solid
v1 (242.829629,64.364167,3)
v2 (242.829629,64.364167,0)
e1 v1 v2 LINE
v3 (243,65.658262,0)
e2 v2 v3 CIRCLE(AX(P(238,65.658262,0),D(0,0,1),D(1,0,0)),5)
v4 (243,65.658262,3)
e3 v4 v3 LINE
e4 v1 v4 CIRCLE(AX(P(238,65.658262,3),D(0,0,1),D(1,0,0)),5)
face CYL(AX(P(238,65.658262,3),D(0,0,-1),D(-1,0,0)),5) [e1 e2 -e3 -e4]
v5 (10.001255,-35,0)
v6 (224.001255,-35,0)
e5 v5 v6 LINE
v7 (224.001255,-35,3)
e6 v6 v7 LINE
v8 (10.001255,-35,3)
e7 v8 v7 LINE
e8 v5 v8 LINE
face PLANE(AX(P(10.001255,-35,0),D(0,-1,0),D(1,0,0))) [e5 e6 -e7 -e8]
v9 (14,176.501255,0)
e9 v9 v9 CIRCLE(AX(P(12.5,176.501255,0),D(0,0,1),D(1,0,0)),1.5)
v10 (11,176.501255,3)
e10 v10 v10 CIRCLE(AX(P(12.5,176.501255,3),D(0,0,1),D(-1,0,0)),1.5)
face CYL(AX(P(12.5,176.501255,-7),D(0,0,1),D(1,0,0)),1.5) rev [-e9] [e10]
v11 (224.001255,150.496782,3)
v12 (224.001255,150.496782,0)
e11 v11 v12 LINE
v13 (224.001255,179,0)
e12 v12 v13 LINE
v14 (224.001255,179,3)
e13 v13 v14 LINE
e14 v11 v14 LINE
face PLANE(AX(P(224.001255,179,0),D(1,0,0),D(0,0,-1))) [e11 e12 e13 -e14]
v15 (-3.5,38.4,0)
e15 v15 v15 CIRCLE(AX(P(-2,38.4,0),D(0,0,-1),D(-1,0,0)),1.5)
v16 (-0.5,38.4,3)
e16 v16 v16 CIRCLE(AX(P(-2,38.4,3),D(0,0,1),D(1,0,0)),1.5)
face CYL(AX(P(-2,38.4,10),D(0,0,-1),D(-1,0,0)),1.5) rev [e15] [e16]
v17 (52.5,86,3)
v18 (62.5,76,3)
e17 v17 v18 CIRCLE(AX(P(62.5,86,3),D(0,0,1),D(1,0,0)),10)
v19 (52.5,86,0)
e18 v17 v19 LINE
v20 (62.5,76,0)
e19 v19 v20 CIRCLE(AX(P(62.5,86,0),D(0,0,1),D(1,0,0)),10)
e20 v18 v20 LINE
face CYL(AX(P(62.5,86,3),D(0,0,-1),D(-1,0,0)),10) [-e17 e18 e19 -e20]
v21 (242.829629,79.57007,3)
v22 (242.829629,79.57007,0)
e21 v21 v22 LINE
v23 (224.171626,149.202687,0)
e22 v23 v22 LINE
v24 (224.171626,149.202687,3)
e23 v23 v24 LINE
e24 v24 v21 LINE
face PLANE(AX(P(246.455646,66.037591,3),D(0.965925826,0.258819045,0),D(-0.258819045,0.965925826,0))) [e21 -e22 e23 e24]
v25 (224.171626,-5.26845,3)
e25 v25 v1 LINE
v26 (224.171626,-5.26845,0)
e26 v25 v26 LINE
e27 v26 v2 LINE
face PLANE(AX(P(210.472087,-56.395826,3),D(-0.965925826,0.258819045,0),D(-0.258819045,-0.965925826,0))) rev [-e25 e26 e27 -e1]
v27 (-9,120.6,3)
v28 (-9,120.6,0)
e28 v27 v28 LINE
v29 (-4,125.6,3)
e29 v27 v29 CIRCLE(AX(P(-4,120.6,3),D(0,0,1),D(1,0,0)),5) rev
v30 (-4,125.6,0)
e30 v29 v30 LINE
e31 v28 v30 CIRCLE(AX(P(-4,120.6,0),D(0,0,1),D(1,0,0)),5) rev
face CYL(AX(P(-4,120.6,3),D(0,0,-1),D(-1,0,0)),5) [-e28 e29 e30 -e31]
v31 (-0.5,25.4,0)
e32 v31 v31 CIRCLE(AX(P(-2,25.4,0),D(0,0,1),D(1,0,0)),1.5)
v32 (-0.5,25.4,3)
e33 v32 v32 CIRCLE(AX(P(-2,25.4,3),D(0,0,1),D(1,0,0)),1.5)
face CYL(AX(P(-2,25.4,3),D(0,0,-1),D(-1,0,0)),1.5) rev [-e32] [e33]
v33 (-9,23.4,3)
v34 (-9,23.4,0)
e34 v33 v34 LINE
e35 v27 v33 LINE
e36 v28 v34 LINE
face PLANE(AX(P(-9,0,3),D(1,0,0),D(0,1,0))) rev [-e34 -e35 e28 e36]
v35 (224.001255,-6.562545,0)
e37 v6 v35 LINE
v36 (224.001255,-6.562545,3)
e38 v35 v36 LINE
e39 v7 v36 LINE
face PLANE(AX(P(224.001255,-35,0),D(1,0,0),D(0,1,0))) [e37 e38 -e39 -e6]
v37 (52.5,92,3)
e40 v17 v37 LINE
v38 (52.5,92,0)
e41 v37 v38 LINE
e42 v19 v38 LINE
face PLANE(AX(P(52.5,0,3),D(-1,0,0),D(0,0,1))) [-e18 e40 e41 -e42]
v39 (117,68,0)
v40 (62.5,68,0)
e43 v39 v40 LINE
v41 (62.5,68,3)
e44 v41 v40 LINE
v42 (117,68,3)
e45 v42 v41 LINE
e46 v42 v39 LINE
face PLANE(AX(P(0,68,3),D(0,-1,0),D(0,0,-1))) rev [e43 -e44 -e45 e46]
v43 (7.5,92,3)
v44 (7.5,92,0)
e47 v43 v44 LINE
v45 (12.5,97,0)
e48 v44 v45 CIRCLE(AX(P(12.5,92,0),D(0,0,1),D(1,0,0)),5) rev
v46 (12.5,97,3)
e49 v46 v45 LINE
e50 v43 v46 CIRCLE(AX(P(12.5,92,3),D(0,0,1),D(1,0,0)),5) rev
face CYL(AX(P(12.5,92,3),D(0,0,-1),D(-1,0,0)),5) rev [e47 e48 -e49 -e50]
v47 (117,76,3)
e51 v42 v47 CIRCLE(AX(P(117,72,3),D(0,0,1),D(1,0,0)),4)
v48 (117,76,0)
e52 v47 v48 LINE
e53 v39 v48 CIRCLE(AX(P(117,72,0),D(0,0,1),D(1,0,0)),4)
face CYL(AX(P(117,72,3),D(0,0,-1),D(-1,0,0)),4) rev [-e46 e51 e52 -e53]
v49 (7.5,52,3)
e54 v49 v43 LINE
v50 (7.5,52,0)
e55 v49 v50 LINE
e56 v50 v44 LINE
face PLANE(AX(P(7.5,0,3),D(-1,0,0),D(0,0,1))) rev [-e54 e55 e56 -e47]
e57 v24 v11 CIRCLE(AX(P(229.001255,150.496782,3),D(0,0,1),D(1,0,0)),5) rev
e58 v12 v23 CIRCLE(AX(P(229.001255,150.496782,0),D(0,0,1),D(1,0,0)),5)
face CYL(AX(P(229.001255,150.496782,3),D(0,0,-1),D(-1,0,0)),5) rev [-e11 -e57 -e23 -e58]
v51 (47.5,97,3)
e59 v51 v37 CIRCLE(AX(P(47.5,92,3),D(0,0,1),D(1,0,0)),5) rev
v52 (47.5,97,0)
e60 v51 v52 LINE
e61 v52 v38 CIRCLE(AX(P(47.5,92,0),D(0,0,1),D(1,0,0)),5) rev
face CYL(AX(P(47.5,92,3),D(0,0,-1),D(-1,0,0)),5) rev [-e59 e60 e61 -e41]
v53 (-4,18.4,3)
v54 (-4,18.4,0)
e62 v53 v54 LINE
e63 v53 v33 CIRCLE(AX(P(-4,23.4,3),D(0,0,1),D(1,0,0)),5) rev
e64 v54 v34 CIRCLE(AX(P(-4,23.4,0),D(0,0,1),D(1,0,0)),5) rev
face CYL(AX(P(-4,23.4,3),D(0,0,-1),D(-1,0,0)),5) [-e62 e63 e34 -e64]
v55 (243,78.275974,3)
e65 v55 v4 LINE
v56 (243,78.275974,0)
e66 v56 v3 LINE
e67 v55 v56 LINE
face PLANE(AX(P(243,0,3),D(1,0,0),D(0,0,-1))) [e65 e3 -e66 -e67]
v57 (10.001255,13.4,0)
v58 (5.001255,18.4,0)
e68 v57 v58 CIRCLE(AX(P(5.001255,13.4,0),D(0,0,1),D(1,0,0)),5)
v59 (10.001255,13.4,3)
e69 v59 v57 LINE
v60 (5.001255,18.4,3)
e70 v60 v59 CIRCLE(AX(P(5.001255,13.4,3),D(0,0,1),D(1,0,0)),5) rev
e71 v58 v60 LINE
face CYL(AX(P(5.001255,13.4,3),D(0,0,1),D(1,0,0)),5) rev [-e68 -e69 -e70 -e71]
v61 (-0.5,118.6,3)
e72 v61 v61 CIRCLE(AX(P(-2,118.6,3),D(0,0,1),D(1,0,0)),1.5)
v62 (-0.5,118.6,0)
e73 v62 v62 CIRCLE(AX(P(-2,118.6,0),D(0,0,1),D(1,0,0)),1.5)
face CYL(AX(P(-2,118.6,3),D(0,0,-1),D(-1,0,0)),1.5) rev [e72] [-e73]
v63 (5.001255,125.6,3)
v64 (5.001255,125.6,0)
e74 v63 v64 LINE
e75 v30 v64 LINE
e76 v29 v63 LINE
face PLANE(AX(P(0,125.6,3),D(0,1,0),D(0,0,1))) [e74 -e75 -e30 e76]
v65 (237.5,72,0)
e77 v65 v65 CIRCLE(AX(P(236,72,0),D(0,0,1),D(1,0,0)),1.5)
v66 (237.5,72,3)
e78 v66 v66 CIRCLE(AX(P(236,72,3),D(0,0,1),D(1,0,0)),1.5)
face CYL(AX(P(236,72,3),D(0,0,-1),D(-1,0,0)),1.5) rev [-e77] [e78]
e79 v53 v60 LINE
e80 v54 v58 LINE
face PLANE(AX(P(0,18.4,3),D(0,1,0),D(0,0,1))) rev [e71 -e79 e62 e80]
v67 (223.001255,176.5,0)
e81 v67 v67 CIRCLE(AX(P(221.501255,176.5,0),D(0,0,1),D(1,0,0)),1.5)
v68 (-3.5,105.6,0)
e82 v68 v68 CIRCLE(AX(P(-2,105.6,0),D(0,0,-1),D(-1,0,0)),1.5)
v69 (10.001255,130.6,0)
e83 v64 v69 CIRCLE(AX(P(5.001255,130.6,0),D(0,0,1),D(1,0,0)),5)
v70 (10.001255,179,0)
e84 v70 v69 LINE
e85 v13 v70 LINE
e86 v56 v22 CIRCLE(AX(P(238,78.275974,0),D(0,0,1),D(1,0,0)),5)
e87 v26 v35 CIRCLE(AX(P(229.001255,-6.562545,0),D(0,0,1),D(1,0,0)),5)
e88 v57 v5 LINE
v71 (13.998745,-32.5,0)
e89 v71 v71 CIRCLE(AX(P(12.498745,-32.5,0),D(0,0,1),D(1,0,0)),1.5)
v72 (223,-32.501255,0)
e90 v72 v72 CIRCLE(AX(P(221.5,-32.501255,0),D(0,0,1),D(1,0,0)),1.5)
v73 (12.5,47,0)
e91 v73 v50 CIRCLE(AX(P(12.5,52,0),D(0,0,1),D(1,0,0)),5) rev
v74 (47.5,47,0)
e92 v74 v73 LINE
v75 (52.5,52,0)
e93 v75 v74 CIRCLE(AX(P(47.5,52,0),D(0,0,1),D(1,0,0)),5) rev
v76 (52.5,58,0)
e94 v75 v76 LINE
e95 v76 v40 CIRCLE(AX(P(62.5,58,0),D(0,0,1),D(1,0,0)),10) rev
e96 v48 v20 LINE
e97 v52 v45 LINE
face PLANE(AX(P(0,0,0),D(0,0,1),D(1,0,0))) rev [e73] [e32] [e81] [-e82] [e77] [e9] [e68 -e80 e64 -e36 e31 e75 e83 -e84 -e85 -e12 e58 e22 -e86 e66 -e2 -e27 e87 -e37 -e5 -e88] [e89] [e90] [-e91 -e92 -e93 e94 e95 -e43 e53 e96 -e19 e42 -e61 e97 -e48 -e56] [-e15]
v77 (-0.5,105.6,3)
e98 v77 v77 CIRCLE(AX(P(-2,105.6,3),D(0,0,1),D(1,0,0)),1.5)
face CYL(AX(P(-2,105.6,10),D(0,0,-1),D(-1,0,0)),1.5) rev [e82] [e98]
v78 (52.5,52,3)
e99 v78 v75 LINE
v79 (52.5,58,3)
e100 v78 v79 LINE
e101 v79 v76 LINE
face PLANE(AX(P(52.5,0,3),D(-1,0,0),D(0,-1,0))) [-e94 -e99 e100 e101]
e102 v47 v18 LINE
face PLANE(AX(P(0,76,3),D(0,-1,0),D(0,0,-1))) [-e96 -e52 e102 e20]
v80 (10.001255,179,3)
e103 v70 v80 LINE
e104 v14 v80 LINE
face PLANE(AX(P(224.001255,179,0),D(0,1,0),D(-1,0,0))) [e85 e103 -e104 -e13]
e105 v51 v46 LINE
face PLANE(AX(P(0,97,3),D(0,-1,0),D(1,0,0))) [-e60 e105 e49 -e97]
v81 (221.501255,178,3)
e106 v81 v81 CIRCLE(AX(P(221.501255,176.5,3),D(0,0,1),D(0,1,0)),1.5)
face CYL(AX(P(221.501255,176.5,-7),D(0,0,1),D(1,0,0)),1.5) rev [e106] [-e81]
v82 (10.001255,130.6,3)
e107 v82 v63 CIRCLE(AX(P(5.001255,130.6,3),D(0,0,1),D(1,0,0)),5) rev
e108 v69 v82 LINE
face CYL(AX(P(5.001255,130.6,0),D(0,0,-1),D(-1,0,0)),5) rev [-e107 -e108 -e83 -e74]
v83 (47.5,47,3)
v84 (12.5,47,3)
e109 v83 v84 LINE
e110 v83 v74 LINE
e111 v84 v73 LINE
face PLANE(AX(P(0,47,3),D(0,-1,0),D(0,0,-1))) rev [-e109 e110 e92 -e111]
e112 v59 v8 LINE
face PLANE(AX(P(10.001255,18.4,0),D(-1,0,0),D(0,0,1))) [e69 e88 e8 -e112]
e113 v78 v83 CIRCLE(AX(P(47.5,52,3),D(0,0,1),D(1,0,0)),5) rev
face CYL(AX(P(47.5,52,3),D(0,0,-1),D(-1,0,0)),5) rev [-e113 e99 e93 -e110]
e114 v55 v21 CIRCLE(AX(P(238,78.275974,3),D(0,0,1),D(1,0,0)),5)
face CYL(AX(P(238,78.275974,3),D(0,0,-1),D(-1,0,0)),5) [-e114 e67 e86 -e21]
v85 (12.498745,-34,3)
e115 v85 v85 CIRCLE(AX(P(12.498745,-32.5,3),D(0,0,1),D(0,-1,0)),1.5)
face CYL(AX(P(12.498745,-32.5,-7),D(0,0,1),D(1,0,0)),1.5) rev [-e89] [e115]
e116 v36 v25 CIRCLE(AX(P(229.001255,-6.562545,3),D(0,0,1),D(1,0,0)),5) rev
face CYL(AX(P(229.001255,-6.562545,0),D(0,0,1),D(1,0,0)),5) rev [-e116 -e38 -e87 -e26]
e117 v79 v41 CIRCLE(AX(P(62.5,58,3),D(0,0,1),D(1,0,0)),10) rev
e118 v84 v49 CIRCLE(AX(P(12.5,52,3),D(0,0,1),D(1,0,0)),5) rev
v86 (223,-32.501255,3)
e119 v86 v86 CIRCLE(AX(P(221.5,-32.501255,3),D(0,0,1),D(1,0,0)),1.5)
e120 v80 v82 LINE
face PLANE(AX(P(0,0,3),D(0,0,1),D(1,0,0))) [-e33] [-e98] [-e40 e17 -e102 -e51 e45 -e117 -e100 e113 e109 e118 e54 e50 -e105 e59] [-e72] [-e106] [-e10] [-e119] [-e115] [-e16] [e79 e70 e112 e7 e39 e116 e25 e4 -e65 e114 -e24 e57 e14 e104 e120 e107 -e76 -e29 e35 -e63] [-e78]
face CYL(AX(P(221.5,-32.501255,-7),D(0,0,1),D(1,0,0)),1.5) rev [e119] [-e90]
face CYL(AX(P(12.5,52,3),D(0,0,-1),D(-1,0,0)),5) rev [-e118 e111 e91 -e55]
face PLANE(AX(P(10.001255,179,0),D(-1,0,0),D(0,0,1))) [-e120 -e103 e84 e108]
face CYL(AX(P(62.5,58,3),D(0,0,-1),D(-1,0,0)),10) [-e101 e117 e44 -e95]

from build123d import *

# Parameters (mm, degrees)
BOSS_EXTRUDE1_OUTLINE_R = 1.5
BOSS_EXTRUDE1_DEPTH     = 3
SKETCH1_R               = 1.5
CUT_EXTRUDE1_DEPTH      = 10
CIRPATTERN1_COUNT       = 4
SKETCH3_W               = 736.909485963
SKETCH3_H               = 680.360125743
CUT_EXTRUDE2_DEPTH      = 304.313928241
FILLET2_R               = 5
FILLET3_R               = 5
SKETCH4_R               = 1.5
CUT_EXTRUDE3_DEPTH      = 10


# Read off the part's stored shape, not the designer's step: Boss-Extrude1
with BuildPart() as part:
    # Boss-Extrude1 outline → Boss-Extrude1 (new body)
    with BuildSketch(Plane.XY):
        with BuildLine():
            ThreePointArc((227.170370868, 138.011217036), (227.042775693, 138.652681301), (227, 139.305312262))
            Line((227, 139.305312262), (227, 176.497490519))
            ThreePointArc((227, 176.497490519), (225.535533906, 180.033024425), (222, 181.497490519))
            Line((222, 181.497490519), (12.343347406, 181.497486855))
            ThreePointArc((12.343347406, 181.497486855), (8.909508183, 179.979649569), (7.5, 176.499941461))
            Line((7.5, 176.499941461), (7.5, 130.6))
            ThreePointArc((7.5, 130.6), (6.035533906, 127.064466094), (2.5, 125.6))
            Line((2.5, 125.6), (-4, 125.6))
            ThreePointArc((-4, 125.6), (-7.535533906, 124.135533906), (-9, 120.6))
            Line((-9, 120.6), (-9, 23.4))
            ThreePointArc((-9, 23.4), (-7.535533906, 19.864466094), (-4, 18.4))
            Line((-4, 18.4), (2.5, 18.4))
            ThreePointArc((2.5, 18.4), (6.035533906, 16.935533906), (7.5, 13.4))
            Line((7.5, 13.4), (7.5, -32.5))
            ThreePointArc((7.5, -32.5), (8.964466094, -36.035533906), (12.5, -37.5))
            Line((12.5, -37.5), (221.5, -37.5))
            ThreePointArc((221.5, -37.5), (225.035533906, -36.035533906), (226.5, -32.5))
            Line((226.5, -32.5), (226.5, 2.762899187))
            ThreePointArc((226.5, 2.762899187), (226.542775693, 3.415530148), (226.670370869, 4.056994413))
            Line((226.670370869, 4.056994413), (242.829629131, 64.364167262))
            ThreePointArc((242.829629131, 64.364167262), (242.957224307, 65.005631527), (243, 65.658262488))
            Line((243, 65.658262488), (243, 78.275974364))
            ThreePointArc((243, 78.275974364), (242.957224307, 78.928605325), (242.829629131, 79.570069589))
            Line((242.829629131, 79.570069589), (227.170370868, 138.011217036))
        make_face()
        with Locations((-2, 25.4)):
            Circle(BOSS_EXTRUDE1_OUTLINE_R, mode=Mode.SUBTRACT)
        with Locations((-2, 118.6)):
            Circle(BOSS_EXTRUDE1_OUTLINE_R, mode=Mode.SUBTRACT)
        with BuildLine():
            ThreePointArc((62.5, 68), (55.428932188, 65.071067812), (52.5, 58))
            Line((52.5, 58), (52.5, 52))
            ThreePointArc((52.5, 52), (51.035533906, 48.464466094), (47.5, 47))
            Line((47.5, 47), (12.5, 47))
            ThreePointArc((12.5, 47), (8.964466094, 48.464466094), (7.5, 52))
            Line((7.5, 52), (7.5, 92))
            ThreePointArc((7.5, 92), (8.964466094, 95.535533906), (12.5, 97))
            Line((12.5, 97), (47.5, 97))
            ThreePointArc((47.5, 97), (51.035533906, 95.535533906), (52.5, 92))
            Line((52.5, 92), (52.5, 86))
            ThreePointArc((52.5, 86), (55.428932188, 78.928932188), (62.5, 76))
            Line((62.5, 76), (117, 76))
            ThreePointArc((117, 76), (121, 72), (117, 68))
            Line((117, 68), (62.5, 68))
        make_face(mode=Mode.SUBTRACT)
        with Locations((236, 72)):
            Circle(BOSS_EXTRUDE1_OUTLINE_R, mode=Mode.SUBTRACT)
    extrude(amount=BOSS_EXTRUDE1_DEPTH)

    # Sketch1 → Cut-Extrude1 (cut)
    with BuildSketch(Plane.XY.offset(3)):
        with Locations((221.5, -32.501254741)):
            Circle(SKETCH1_R)
    cut_extrude1 = extrude(amount=-CUT_EXTRUDE1_DEPTH, mode=Mode.SUBTRACT)

    # CirPattern1: Cut-Extrude1 ×4 about axis
    cirpattern1_axis = Axis((117, 72, 0), (0, 0, 1))
    for i in range(1, CIRPATTERN1_COUNT):
        add(cut_extrude1.rotate(cirpattern1_axis, i * 360 / CIRPATTERN1_COUNT), mode=Mode.SUBTRACT)

    # Sketch3 → Cut-Extrude2 (cut, through all)
    with BuildSketch(Plane.XY.offset(3)):
        with Locations((306.942195916, -80.480880195)):
            Rectangle(SKETCH3_W, SKETCH3_H)
        Polygon((-4, 18.4), (10.001254741, 18.4), (10.001254741, -35), (224.001254741, -35), (224.001254741, -5.904282588), (241.995428238, 61.250887144), (247.405063047, 62.49431775), (224.001254741, 149.838519439), (224.001254741, 179), (10.001254741, 179), (10.001254741, 125.6), (-4, 125.6), (-27.04848394, 125.6), (-22.601157645, 14.939042157), align=None, mode=Mode.SUBTRACT)
    extrude(amount=-CUT_EXTRUDE2_DEPTH, mode=Mode.SUBTRACT)

    # Fillet2
    fillet2_edges = [part.edges().sort_by_distance(p)[0] for p in [
        (10.001254741, 125.6, 1.5),
        (10.001254741, 18.4, 1.5),
    ]]
    fillet(fillet2_edges, radius=FILLET2_R)

    # Fillet3
    fillet3_edges = [part.edges().sort_by_distance(p)[0] for p in [
        (224.001254741, -5.904282588, 1.5),
        (224.001254741, 149.838519439, 1.5),
    ]]
    fillet(fillet3_edges, radius=FILLET3_R)

    # Sketch4 → Cut-Extrude3 (cut)
    with BuildSketch(Plane(origin=(0, 0, 0), x_dir=(-1, 0, 0), z_dir=(0, 0, -1))):
        with Locations((2, 105.6)):
            Circle(SKETCH4_R)
        with Locations((2, 38.4)):
            Circle(SKETCH4_R)
    extrude(amount=-CUT_EXTRUDE3_DEPTH, mode=Mode.SUBTRACT)


solid = part.part
